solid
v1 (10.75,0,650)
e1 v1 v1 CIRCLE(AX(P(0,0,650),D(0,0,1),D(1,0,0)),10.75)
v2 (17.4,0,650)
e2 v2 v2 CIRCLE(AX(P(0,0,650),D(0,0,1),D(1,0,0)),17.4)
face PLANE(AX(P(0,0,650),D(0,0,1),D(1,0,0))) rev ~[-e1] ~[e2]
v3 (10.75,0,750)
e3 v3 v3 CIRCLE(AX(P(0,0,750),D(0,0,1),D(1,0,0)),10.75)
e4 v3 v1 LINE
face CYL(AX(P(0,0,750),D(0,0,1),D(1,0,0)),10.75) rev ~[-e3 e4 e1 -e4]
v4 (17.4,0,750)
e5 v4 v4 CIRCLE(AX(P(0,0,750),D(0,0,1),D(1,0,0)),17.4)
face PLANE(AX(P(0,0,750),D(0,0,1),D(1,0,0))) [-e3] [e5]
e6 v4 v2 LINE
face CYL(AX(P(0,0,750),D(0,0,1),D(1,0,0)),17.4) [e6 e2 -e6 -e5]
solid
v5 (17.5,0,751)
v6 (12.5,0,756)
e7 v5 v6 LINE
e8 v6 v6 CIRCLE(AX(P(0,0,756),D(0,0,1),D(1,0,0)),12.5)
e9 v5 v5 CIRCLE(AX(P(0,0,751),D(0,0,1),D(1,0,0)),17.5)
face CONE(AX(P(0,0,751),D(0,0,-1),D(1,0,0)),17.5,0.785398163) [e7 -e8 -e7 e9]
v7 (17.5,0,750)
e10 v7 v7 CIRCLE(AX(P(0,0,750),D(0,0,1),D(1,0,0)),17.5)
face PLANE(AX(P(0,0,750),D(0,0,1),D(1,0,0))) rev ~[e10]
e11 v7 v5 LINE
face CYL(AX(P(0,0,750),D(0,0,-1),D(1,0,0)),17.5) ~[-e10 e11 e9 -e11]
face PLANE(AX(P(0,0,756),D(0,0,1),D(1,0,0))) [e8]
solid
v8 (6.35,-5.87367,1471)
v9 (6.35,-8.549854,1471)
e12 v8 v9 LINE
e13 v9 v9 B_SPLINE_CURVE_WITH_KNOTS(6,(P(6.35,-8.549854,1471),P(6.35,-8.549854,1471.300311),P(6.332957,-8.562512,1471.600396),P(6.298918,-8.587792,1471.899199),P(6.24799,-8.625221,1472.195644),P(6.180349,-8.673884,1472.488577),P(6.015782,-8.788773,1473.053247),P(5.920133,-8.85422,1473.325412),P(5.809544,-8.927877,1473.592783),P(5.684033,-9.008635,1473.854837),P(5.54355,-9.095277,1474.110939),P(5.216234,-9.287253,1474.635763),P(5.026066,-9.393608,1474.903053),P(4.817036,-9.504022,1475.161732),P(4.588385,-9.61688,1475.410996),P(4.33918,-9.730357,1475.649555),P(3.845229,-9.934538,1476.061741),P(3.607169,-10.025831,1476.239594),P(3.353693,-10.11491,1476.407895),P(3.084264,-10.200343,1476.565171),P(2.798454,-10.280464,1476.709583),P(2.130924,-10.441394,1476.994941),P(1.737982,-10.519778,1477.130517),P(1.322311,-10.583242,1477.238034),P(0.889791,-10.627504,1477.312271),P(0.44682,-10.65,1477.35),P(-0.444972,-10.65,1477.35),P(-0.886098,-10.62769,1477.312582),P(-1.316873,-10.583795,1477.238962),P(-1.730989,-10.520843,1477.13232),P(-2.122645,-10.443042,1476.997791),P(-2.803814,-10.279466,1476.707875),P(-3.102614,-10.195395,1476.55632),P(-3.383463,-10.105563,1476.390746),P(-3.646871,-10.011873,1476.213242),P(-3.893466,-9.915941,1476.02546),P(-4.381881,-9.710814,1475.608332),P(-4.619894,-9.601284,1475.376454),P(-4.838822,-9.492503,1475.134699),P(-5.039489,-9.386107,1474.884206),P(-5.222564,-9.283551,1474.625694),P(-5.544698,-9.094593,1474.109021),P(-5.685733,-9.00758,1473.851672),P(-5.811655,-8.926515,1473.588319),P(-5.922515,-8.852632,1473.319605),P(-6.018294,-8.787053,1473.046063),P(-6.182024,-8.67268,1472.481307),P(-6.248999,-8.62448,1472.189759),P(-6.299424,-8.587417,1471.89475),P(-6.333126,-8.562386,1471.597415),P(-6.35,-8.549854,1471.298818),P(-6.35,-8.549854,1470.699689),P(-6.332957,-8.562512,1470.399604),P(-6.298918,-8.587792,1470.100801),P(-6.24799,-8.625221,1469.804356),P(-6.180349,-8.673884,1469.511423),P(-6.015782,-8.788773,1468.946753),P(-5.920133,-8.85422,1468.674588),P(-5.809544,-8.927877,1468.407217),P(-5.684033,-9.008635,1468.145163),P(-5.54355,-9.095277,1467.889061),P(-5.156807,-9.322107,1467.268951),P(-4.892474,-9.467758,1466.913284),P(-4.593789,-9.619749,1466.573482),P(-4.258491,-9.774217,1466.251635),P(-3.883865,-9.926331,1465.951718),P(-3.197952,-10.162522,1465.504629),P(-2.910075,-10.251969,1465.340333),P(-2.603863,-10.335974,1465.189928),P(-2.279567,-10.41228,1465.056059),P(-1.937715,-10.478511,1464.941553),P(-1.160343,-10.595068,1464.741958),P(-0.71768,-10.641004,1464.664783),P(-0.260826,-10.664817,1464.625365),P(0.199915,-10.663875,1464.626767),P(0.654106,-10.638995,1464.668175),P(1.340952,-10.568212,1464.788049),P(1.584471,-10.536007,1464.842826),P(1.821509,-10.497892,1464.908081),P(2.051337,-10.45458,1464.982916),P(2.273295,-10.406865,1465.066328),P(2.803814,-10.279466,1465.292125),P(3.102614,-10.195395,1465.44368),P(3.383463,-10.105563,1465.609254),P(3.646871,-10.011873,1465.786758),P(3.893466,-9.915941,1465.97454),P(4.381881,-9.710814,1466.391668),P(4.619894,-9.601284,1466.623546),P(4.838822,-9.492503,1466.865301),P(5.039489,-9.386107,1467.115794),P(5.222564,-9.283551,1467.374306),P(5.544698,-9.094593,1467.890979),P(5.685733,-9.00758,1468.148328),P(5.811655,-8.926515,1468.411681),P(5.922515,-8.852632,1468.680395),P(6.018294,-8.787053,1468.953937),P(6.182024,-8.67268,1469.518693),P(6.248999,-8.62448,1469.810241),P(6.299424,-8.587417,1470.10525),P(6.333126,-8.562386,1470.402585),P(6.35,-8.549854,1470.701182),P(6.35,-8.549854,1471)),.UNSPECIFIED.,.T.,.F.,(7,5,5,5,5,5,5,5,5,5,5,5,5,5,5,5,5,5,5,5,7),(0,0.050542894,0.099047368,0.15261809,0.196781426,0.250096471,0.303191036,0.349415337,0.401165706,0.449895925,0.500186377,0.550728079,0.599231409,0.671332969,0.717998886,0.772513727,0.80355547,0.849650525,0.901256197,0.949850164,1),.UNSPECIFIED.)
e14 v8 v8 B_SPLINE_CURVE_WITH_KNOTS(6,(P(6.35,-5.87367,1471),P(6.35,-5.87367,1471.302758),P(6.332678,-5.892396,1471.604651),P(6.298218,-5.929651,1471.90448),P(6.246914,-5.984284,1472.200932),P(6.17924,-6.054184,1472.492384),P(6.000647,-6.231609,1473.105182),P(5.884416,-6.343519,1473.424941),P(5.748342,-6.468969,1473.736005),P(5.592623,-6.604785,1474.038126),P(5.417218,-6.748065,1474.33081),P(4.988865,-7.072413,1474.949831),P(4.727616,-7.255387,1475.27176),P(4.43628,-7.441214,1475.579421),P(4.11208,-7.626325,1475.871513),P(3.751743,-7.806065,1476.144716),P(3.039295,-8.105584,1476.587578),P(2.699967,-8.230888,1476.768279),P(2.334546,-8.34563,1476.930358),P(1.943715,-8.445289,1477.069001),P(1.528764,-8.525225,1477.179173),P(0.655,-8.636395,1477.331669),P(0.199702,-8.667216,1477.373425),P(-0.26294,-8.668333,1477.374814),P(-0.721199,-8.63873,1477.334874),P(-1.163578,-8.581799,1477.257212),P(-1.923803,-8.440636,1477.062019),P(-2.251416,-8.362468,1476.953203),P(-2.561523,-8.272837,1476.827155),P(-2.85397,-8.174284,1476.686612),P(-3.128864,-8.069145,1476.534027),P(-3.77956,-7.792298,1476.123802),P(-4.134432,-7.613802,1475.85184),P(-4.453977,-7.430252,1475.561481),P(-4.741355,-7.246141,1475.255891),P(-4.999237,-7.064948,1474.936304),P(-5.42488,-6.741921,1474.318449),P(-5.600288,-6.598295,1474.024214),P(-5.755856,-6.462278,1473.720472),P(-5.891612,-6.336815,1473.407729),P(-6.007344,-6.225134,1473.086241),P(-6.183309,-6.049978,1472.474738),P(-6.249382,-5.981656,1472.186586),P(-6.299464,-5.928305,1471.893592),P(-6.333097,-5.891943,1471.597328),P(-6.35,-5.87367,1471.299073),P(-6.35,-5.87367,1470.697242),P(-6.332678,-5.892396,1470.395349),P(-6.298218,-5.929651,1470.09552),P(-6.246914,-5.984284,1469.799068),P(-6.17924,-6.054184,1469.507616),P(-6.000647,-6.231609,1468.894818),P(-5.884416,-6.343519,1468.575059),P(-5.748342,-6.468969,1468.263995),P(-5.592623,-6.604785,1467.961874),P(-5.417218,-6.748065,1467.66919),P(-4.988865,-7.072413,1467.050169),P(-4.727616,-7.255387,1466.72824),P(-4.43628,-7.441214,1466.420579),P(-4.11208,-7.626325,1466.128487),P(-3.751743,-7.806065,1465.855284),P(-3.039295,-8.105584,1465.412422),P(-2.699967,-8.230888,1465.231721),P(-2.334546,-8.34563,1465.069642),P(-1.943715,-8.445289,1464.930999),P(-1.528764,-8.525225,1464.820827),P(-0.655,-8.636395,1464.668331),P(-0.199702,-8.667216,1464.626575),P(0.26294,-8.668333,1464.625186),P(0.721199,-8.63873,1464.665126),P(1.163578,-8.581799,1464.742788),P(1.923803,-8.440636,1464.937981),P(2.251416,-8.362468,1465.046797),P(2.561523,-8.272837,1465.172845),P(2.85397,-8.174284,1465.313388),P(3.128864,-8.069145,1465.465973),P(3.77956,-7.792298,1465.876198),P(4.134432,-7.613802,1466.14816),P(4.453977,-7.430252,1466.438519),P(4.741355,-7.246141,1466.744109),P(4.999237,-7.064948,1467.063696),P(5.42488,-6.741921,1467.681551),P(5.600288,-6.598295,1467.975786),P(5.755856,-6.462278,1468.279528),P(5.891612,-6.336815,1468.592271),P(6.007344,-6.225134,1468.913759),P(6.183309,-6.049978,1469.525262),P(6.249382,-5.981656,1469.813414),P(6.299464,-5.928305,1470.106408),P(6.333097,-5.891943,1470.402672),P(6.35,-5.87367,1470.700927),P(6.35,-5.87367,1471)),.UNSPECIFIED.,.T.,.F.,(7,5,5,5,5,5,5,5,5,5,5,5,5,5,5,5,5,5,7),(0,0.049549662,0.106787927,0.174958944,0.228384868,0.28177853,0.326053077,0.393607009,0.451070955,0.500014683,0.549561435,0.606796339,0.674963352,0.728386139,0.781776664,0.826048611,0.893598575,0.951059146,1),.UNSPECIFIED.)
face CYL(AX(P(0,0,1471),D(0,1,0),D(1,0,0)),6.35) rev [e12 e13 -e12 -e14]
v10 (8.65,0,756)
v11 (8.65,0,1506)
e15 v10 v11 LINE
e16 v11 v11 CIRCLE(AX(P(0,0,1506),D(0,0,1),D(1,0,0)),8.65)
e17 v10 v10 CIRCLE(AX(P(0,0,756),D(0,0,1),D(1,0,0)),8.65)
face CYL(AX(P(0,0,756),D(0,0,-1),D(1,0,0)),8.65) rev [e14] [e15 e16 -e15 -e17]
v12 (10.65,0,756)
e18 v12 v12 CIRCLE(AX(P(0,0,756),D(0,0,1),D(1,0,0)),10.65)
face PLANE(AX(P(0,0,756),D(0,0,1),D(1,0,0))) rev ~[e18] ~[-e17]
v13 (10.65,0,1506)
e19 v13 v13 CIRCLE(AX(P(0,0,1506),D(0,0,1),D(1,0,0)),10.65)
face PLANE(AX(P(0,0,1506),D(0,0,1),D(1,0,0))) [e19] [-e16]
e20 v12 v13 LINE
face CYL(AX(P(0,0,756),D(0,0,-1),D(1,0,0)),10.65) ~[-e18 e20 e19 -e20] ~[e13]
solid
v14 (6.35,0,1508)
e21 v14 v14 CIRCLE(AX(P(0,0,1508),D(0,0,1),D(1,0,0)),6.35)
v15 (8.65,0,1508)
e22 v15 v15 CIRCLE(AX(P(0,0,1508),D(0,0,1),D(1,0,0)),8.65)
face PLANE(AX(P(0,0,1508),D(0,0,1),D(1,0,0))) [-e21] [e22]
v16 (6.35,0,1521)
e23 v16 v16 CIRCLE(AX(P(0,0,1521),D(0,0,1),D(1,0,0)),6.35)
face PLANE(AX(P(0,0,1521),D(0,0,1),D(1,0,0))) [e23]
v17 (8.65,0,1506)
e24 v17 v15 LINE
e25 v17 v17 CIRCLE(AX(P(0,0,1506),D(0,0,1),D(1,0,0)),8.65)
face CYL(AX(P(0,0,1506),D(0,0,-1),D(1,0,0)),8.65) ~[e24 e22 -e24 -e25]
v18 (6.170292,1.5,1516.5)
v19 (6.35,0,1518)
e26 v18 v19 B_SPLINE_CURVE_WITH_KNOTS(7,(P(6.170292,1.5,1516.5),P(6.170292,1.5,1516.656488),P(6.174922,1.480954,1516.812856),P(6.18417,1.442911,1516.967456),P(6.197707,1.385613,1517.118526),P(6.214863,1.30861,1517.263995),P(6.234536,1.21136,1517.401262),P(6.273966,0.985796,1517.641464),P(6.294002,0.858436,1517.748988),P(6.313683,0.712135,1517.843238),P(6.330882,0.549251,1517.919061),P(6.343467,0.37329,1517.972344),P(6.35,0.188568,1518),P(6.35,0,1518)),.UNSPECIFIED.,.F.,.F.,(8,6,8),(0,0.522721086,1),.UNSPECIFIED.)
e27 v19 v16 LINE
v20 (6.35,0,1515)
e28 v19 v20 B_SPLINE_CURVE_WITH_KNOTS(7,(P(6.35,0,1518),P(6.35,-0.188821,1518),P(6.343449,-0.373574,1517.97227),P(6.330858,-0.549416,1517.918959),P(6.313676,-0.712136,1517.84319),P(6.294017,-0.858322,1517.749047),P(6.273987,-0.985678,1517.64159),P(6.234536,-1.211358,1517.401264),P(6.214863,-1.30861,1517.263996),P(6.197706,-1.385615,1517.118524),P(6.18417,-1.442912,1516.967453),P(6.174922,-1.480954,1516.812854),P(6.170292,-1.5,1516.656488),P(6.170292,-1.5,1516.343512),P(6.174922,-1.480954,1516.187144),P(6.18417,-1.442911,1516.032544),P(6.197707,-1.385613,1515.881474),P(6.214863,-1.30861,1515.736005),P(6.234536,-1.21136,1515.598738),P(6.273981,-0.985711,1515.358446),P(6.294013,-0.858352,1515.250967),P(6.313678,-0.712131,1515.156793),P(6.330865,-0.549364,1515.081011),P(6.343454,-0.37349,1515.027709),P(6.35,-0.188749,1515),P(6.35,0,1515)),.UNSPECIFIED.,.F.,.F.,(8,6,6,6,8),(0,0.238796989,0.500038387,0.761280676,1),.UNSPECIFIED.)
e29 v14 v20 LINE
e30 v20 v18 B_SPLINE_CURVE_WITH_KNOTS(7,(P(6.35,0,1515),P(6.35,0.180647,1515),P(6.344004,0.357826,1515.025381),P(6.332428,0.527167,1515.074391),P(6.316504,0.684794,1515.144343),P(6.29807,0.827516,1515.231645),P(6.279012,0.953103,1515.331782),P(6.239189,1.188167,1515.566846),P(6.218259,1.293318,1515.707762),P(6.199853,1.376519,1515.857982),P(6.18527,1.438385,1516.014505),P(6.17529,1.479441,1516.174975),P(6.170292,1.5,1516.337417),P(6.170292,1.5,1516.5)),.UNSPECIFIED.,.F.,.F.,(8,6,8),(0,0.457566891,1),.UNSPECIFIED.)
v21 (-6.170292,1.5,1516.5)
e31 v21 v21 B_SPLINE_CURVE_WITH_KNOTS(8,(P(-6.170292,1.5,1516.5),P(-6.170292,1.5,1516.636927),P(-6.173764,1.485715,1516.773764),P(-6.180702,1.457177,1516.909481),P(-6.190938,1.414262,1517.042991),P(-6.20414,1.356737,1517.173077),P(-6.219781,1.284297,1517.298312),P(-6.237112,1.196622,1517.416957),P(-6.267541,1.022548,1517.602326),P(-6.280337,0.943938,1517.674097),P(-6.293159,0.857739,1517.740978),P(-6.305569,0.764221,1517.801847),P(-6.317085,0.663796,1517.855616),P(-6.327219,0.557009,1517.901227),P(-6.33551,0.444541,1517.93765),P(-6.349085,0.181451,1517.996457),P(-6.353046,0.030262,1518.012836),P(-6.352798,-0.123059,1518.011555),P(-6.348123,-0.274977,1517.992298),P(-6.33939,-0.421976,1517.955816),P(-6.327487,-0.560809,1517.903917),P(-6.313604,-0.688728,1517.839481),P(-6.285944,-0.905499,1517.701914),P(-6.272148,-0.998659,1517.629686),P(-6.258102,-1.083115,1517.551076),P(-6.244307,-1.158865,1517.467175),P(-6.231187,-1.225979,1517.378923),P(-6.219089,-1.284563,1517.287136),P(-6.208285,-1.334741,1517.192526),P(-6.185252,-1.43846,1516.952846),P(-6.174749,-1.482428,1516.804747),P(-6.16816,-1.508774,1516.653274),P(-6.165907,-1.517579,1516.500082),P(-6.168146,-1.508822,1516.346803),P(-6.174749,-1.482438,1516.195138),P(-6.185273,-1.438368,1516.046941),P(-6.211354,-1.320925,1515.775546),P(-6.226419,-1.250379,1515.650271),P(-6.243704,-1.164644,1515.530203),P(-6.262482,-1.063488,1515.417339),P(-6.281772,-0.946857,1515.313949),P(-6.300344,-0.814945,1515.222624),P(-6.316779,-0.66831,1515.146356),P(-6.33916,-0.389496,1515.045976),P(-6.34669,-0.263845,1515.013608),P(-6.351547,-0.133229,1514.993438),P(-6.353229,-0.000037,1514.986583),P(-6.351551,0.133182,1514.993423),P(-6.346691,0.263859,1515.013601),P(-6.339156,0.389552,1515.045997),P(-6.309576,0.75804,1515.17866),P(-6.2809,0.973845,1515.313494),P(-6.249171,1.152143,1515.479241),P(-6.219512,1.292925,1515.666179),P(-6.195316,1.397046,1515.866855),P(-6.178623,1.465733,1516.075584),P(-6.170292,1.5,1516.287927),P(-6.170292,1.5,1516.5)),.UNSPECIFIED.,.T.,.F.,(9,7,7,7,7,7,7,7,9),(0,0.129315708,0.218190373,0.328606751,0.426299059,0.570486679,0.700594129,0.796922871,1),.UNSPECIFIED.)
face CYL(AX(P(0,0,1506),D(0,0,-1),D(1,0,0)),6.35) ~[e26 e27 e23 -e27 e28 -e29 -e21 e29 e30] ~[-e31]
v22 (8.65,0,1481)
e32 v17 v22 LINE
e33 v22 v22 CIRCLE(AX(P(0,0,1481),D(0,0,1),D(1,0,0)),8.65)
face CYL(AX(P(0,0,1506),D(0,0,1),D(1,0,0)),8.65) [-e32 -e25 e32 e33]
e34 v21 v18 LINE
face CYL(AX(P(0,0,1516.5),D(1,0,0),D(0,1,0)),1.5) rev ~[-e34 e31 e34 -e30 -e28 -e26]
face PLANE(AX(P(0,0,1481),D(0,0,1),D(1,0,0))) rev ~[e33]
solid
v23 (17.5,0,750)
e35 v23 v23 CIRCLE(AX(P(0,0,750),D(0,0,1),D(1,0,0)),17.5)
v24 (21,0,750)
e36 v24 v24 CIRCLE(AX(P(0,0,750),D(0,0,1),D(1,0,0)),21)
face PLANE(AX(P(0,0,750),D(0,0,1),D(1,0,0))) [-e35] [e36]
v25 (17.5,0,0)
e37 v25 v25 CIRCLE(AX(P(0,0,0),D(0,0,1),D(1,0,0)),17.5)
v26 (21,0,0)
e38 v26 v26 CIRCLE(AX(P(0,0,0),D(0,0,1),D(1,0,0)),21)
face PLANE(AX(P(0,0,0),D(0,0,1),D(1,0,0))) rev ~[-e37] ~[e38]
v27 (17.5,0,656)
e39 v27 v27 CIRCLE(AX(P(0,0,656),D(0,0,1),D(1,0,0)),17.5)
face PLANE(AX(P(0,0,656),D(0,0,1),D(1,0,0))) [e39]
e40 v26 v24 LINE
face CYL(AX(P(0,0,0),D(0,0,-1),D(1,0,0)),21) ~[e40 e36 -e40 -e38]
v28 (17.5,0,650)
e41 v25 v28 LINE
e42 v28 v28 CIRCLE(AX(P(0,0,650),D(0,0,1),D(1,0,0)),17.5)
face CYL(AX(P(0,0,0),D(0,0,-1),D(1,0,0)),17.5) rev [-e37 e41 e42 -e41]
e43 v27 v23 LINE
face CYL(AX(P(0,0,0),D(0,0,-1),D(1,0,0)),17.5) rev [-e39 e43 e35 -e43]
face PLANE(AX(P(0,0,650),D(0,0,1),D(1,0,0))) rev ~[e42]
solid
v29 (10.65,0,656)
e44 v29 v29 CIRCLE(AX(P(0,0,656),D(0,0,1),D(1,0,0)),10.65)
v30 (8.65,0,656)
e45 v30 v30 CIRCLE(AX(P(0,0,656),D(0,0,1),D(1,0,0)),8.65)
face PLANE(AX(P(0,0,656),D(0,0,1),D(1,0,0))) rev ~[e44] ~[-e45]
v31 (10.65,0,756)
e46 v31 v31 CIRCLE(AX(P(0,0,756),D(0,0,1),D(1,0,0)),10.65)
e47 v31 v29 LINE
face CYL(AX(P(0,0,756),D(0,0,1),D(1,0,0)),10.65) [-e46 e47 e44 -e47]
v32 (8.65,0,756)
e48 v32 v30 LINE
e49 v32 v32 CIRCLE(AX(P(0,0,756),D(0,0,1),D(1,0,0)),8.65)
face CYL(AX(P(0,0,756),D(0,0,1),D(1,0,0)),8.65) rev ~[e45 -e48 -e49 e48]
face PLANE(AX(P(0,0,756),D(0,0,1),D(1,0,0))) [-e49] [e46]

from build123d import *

# Parameters (mm, degrees)
F0_R      = 21
F0_R_2    = 17.5
F1_DEPTH  = 750
F2_R      = 17.5
F3_DEPTH  = 6
F4_R      = 10.65
F4_R_2    = 8.65
F5_DEPTH  = 750
F6_R      = 10.65
F6_R_2    = 8.65
F7_DEPTH  = 100
F9_R      = 17.5
F10_DEPTH = 6
F11_R     = 8.65
F12_DEPTH = 25
F13_R     = 6.35
F14_DEPTH = 15
F15_DEPTH = 15
F16_R     = 1.5
F17_DEPTH = 10
F18_R     = 8.65
F18_R_2   = 6.35
F19_DEPTH = 2
F20_R     = 6.35
F21_DEPTH = 21.001
F22_R     = 17.4
F22_R_2   = 10.75
F23_DEPTH = 100
F24_SIZE  = 5


with BuildPart() as f1:
    # F0 (on Top) → F1 (new body)
    with BuildSketch(Plane.XY):
        Circle(F0_R)
        Circle(F0_R_2, mode=Mode.SUBTRACT)
    extrude(amount=F1_DEPTH)

    # F9 (on offset) → F10 (join)
    with BuildSketch(Plane.XY.offset(650)):
        Circle(F9_R)
    extrude(amount=F10_DEPTH)


with BuildPart() as f3:
    # F2 (on face) → F3 (new body)
    with BuildSketch(Plane.XY.offset(750)):
        Circle(F2_R)
    extrude(amount=F3_DEPTH)

    # F24
    f24_edges = [f3.edges().sort_by_distance(p)[0] for p in [
        (-17.5, 0, 756),
    ]]
    chamfer(f24_edges, length=F24_SIZE)


with BuildPart() as f5:
    # F4 (on face) → F5 (new body)
    with BuildSketch(Plane.XY.offset(756)):
        Circle(F4_R)
        Circle(F4_R_2, mode=Mode.SUBTRACT)
    extrude(amount=F5_DEPTH)

    # F20 (on Front) → F21 (cut, through all)
    with BuildSketch(Plane.XZ):
        with Locations((0, 1471)):
            Circle(F20_R)
    extrude(amount=F21_DEPTH, mode=Mode.SUBTRACT)


with BuildPart() as f7:
    # F6 (on face) → F7 (new body)
    with BuildSketch(Plane.XY.offset(756)):
        Circle(F6_R)
        Circle(F6_R_2, mode=Mode.SUBTRACT)
    extrude(amount=-F7_DEPTH)


with BuildPart() as f12:
    # F11 (on face) → F12 (new body)
    with BuildSketch(Plane.XY.offset(1506)):
        Circle(F11_R)
    extrude(amount=-F12_DEPTH)

    # F13 (on face) → F14 (join)
    with BuildSketch(Plane.XY.offset(1506)):
        Circle(F13_R)
    extrude(amount=F14_DEPTH)

    # F13 (on face) → F15 (join)
    with BuildSketch(Plane.XY.offset(1506)):
        Circle(F13_R)
    extrude(amount=F15_DEPTH)

    # F16 (on Right) → F17 (cut, symmetric)
    with BuildSketch(Plane.YZ):
        with Locations((0, 1516.5)):
            Circle(F16_R)
    extrude(amount=F17_DEPTH, both=True, mode=Mode.SUBTRACT)

    # F18 (on face) → F19 (join)
    with BuildSketch(Plane.XY.offset(1506)):
        Circle(F18_R)
        Circle(F18_R_2, mode=Mode.SUBTRACT)
    extrude(amount=F19_DEPTH)


with BuildPart() as f23:
    # F22 (on face) → F23 (new body)
    with BuildSketch(Plane.XY.offset(750)):
        Circle(F22_R)
        Circle(F22_R_2, mode=Mode.SUBTRACT)
    extrude(amount=-F23_DEPTH)


solid = Compound([f1.part, f3.part, f5.part, f7.part, f12.part, f23.part])
